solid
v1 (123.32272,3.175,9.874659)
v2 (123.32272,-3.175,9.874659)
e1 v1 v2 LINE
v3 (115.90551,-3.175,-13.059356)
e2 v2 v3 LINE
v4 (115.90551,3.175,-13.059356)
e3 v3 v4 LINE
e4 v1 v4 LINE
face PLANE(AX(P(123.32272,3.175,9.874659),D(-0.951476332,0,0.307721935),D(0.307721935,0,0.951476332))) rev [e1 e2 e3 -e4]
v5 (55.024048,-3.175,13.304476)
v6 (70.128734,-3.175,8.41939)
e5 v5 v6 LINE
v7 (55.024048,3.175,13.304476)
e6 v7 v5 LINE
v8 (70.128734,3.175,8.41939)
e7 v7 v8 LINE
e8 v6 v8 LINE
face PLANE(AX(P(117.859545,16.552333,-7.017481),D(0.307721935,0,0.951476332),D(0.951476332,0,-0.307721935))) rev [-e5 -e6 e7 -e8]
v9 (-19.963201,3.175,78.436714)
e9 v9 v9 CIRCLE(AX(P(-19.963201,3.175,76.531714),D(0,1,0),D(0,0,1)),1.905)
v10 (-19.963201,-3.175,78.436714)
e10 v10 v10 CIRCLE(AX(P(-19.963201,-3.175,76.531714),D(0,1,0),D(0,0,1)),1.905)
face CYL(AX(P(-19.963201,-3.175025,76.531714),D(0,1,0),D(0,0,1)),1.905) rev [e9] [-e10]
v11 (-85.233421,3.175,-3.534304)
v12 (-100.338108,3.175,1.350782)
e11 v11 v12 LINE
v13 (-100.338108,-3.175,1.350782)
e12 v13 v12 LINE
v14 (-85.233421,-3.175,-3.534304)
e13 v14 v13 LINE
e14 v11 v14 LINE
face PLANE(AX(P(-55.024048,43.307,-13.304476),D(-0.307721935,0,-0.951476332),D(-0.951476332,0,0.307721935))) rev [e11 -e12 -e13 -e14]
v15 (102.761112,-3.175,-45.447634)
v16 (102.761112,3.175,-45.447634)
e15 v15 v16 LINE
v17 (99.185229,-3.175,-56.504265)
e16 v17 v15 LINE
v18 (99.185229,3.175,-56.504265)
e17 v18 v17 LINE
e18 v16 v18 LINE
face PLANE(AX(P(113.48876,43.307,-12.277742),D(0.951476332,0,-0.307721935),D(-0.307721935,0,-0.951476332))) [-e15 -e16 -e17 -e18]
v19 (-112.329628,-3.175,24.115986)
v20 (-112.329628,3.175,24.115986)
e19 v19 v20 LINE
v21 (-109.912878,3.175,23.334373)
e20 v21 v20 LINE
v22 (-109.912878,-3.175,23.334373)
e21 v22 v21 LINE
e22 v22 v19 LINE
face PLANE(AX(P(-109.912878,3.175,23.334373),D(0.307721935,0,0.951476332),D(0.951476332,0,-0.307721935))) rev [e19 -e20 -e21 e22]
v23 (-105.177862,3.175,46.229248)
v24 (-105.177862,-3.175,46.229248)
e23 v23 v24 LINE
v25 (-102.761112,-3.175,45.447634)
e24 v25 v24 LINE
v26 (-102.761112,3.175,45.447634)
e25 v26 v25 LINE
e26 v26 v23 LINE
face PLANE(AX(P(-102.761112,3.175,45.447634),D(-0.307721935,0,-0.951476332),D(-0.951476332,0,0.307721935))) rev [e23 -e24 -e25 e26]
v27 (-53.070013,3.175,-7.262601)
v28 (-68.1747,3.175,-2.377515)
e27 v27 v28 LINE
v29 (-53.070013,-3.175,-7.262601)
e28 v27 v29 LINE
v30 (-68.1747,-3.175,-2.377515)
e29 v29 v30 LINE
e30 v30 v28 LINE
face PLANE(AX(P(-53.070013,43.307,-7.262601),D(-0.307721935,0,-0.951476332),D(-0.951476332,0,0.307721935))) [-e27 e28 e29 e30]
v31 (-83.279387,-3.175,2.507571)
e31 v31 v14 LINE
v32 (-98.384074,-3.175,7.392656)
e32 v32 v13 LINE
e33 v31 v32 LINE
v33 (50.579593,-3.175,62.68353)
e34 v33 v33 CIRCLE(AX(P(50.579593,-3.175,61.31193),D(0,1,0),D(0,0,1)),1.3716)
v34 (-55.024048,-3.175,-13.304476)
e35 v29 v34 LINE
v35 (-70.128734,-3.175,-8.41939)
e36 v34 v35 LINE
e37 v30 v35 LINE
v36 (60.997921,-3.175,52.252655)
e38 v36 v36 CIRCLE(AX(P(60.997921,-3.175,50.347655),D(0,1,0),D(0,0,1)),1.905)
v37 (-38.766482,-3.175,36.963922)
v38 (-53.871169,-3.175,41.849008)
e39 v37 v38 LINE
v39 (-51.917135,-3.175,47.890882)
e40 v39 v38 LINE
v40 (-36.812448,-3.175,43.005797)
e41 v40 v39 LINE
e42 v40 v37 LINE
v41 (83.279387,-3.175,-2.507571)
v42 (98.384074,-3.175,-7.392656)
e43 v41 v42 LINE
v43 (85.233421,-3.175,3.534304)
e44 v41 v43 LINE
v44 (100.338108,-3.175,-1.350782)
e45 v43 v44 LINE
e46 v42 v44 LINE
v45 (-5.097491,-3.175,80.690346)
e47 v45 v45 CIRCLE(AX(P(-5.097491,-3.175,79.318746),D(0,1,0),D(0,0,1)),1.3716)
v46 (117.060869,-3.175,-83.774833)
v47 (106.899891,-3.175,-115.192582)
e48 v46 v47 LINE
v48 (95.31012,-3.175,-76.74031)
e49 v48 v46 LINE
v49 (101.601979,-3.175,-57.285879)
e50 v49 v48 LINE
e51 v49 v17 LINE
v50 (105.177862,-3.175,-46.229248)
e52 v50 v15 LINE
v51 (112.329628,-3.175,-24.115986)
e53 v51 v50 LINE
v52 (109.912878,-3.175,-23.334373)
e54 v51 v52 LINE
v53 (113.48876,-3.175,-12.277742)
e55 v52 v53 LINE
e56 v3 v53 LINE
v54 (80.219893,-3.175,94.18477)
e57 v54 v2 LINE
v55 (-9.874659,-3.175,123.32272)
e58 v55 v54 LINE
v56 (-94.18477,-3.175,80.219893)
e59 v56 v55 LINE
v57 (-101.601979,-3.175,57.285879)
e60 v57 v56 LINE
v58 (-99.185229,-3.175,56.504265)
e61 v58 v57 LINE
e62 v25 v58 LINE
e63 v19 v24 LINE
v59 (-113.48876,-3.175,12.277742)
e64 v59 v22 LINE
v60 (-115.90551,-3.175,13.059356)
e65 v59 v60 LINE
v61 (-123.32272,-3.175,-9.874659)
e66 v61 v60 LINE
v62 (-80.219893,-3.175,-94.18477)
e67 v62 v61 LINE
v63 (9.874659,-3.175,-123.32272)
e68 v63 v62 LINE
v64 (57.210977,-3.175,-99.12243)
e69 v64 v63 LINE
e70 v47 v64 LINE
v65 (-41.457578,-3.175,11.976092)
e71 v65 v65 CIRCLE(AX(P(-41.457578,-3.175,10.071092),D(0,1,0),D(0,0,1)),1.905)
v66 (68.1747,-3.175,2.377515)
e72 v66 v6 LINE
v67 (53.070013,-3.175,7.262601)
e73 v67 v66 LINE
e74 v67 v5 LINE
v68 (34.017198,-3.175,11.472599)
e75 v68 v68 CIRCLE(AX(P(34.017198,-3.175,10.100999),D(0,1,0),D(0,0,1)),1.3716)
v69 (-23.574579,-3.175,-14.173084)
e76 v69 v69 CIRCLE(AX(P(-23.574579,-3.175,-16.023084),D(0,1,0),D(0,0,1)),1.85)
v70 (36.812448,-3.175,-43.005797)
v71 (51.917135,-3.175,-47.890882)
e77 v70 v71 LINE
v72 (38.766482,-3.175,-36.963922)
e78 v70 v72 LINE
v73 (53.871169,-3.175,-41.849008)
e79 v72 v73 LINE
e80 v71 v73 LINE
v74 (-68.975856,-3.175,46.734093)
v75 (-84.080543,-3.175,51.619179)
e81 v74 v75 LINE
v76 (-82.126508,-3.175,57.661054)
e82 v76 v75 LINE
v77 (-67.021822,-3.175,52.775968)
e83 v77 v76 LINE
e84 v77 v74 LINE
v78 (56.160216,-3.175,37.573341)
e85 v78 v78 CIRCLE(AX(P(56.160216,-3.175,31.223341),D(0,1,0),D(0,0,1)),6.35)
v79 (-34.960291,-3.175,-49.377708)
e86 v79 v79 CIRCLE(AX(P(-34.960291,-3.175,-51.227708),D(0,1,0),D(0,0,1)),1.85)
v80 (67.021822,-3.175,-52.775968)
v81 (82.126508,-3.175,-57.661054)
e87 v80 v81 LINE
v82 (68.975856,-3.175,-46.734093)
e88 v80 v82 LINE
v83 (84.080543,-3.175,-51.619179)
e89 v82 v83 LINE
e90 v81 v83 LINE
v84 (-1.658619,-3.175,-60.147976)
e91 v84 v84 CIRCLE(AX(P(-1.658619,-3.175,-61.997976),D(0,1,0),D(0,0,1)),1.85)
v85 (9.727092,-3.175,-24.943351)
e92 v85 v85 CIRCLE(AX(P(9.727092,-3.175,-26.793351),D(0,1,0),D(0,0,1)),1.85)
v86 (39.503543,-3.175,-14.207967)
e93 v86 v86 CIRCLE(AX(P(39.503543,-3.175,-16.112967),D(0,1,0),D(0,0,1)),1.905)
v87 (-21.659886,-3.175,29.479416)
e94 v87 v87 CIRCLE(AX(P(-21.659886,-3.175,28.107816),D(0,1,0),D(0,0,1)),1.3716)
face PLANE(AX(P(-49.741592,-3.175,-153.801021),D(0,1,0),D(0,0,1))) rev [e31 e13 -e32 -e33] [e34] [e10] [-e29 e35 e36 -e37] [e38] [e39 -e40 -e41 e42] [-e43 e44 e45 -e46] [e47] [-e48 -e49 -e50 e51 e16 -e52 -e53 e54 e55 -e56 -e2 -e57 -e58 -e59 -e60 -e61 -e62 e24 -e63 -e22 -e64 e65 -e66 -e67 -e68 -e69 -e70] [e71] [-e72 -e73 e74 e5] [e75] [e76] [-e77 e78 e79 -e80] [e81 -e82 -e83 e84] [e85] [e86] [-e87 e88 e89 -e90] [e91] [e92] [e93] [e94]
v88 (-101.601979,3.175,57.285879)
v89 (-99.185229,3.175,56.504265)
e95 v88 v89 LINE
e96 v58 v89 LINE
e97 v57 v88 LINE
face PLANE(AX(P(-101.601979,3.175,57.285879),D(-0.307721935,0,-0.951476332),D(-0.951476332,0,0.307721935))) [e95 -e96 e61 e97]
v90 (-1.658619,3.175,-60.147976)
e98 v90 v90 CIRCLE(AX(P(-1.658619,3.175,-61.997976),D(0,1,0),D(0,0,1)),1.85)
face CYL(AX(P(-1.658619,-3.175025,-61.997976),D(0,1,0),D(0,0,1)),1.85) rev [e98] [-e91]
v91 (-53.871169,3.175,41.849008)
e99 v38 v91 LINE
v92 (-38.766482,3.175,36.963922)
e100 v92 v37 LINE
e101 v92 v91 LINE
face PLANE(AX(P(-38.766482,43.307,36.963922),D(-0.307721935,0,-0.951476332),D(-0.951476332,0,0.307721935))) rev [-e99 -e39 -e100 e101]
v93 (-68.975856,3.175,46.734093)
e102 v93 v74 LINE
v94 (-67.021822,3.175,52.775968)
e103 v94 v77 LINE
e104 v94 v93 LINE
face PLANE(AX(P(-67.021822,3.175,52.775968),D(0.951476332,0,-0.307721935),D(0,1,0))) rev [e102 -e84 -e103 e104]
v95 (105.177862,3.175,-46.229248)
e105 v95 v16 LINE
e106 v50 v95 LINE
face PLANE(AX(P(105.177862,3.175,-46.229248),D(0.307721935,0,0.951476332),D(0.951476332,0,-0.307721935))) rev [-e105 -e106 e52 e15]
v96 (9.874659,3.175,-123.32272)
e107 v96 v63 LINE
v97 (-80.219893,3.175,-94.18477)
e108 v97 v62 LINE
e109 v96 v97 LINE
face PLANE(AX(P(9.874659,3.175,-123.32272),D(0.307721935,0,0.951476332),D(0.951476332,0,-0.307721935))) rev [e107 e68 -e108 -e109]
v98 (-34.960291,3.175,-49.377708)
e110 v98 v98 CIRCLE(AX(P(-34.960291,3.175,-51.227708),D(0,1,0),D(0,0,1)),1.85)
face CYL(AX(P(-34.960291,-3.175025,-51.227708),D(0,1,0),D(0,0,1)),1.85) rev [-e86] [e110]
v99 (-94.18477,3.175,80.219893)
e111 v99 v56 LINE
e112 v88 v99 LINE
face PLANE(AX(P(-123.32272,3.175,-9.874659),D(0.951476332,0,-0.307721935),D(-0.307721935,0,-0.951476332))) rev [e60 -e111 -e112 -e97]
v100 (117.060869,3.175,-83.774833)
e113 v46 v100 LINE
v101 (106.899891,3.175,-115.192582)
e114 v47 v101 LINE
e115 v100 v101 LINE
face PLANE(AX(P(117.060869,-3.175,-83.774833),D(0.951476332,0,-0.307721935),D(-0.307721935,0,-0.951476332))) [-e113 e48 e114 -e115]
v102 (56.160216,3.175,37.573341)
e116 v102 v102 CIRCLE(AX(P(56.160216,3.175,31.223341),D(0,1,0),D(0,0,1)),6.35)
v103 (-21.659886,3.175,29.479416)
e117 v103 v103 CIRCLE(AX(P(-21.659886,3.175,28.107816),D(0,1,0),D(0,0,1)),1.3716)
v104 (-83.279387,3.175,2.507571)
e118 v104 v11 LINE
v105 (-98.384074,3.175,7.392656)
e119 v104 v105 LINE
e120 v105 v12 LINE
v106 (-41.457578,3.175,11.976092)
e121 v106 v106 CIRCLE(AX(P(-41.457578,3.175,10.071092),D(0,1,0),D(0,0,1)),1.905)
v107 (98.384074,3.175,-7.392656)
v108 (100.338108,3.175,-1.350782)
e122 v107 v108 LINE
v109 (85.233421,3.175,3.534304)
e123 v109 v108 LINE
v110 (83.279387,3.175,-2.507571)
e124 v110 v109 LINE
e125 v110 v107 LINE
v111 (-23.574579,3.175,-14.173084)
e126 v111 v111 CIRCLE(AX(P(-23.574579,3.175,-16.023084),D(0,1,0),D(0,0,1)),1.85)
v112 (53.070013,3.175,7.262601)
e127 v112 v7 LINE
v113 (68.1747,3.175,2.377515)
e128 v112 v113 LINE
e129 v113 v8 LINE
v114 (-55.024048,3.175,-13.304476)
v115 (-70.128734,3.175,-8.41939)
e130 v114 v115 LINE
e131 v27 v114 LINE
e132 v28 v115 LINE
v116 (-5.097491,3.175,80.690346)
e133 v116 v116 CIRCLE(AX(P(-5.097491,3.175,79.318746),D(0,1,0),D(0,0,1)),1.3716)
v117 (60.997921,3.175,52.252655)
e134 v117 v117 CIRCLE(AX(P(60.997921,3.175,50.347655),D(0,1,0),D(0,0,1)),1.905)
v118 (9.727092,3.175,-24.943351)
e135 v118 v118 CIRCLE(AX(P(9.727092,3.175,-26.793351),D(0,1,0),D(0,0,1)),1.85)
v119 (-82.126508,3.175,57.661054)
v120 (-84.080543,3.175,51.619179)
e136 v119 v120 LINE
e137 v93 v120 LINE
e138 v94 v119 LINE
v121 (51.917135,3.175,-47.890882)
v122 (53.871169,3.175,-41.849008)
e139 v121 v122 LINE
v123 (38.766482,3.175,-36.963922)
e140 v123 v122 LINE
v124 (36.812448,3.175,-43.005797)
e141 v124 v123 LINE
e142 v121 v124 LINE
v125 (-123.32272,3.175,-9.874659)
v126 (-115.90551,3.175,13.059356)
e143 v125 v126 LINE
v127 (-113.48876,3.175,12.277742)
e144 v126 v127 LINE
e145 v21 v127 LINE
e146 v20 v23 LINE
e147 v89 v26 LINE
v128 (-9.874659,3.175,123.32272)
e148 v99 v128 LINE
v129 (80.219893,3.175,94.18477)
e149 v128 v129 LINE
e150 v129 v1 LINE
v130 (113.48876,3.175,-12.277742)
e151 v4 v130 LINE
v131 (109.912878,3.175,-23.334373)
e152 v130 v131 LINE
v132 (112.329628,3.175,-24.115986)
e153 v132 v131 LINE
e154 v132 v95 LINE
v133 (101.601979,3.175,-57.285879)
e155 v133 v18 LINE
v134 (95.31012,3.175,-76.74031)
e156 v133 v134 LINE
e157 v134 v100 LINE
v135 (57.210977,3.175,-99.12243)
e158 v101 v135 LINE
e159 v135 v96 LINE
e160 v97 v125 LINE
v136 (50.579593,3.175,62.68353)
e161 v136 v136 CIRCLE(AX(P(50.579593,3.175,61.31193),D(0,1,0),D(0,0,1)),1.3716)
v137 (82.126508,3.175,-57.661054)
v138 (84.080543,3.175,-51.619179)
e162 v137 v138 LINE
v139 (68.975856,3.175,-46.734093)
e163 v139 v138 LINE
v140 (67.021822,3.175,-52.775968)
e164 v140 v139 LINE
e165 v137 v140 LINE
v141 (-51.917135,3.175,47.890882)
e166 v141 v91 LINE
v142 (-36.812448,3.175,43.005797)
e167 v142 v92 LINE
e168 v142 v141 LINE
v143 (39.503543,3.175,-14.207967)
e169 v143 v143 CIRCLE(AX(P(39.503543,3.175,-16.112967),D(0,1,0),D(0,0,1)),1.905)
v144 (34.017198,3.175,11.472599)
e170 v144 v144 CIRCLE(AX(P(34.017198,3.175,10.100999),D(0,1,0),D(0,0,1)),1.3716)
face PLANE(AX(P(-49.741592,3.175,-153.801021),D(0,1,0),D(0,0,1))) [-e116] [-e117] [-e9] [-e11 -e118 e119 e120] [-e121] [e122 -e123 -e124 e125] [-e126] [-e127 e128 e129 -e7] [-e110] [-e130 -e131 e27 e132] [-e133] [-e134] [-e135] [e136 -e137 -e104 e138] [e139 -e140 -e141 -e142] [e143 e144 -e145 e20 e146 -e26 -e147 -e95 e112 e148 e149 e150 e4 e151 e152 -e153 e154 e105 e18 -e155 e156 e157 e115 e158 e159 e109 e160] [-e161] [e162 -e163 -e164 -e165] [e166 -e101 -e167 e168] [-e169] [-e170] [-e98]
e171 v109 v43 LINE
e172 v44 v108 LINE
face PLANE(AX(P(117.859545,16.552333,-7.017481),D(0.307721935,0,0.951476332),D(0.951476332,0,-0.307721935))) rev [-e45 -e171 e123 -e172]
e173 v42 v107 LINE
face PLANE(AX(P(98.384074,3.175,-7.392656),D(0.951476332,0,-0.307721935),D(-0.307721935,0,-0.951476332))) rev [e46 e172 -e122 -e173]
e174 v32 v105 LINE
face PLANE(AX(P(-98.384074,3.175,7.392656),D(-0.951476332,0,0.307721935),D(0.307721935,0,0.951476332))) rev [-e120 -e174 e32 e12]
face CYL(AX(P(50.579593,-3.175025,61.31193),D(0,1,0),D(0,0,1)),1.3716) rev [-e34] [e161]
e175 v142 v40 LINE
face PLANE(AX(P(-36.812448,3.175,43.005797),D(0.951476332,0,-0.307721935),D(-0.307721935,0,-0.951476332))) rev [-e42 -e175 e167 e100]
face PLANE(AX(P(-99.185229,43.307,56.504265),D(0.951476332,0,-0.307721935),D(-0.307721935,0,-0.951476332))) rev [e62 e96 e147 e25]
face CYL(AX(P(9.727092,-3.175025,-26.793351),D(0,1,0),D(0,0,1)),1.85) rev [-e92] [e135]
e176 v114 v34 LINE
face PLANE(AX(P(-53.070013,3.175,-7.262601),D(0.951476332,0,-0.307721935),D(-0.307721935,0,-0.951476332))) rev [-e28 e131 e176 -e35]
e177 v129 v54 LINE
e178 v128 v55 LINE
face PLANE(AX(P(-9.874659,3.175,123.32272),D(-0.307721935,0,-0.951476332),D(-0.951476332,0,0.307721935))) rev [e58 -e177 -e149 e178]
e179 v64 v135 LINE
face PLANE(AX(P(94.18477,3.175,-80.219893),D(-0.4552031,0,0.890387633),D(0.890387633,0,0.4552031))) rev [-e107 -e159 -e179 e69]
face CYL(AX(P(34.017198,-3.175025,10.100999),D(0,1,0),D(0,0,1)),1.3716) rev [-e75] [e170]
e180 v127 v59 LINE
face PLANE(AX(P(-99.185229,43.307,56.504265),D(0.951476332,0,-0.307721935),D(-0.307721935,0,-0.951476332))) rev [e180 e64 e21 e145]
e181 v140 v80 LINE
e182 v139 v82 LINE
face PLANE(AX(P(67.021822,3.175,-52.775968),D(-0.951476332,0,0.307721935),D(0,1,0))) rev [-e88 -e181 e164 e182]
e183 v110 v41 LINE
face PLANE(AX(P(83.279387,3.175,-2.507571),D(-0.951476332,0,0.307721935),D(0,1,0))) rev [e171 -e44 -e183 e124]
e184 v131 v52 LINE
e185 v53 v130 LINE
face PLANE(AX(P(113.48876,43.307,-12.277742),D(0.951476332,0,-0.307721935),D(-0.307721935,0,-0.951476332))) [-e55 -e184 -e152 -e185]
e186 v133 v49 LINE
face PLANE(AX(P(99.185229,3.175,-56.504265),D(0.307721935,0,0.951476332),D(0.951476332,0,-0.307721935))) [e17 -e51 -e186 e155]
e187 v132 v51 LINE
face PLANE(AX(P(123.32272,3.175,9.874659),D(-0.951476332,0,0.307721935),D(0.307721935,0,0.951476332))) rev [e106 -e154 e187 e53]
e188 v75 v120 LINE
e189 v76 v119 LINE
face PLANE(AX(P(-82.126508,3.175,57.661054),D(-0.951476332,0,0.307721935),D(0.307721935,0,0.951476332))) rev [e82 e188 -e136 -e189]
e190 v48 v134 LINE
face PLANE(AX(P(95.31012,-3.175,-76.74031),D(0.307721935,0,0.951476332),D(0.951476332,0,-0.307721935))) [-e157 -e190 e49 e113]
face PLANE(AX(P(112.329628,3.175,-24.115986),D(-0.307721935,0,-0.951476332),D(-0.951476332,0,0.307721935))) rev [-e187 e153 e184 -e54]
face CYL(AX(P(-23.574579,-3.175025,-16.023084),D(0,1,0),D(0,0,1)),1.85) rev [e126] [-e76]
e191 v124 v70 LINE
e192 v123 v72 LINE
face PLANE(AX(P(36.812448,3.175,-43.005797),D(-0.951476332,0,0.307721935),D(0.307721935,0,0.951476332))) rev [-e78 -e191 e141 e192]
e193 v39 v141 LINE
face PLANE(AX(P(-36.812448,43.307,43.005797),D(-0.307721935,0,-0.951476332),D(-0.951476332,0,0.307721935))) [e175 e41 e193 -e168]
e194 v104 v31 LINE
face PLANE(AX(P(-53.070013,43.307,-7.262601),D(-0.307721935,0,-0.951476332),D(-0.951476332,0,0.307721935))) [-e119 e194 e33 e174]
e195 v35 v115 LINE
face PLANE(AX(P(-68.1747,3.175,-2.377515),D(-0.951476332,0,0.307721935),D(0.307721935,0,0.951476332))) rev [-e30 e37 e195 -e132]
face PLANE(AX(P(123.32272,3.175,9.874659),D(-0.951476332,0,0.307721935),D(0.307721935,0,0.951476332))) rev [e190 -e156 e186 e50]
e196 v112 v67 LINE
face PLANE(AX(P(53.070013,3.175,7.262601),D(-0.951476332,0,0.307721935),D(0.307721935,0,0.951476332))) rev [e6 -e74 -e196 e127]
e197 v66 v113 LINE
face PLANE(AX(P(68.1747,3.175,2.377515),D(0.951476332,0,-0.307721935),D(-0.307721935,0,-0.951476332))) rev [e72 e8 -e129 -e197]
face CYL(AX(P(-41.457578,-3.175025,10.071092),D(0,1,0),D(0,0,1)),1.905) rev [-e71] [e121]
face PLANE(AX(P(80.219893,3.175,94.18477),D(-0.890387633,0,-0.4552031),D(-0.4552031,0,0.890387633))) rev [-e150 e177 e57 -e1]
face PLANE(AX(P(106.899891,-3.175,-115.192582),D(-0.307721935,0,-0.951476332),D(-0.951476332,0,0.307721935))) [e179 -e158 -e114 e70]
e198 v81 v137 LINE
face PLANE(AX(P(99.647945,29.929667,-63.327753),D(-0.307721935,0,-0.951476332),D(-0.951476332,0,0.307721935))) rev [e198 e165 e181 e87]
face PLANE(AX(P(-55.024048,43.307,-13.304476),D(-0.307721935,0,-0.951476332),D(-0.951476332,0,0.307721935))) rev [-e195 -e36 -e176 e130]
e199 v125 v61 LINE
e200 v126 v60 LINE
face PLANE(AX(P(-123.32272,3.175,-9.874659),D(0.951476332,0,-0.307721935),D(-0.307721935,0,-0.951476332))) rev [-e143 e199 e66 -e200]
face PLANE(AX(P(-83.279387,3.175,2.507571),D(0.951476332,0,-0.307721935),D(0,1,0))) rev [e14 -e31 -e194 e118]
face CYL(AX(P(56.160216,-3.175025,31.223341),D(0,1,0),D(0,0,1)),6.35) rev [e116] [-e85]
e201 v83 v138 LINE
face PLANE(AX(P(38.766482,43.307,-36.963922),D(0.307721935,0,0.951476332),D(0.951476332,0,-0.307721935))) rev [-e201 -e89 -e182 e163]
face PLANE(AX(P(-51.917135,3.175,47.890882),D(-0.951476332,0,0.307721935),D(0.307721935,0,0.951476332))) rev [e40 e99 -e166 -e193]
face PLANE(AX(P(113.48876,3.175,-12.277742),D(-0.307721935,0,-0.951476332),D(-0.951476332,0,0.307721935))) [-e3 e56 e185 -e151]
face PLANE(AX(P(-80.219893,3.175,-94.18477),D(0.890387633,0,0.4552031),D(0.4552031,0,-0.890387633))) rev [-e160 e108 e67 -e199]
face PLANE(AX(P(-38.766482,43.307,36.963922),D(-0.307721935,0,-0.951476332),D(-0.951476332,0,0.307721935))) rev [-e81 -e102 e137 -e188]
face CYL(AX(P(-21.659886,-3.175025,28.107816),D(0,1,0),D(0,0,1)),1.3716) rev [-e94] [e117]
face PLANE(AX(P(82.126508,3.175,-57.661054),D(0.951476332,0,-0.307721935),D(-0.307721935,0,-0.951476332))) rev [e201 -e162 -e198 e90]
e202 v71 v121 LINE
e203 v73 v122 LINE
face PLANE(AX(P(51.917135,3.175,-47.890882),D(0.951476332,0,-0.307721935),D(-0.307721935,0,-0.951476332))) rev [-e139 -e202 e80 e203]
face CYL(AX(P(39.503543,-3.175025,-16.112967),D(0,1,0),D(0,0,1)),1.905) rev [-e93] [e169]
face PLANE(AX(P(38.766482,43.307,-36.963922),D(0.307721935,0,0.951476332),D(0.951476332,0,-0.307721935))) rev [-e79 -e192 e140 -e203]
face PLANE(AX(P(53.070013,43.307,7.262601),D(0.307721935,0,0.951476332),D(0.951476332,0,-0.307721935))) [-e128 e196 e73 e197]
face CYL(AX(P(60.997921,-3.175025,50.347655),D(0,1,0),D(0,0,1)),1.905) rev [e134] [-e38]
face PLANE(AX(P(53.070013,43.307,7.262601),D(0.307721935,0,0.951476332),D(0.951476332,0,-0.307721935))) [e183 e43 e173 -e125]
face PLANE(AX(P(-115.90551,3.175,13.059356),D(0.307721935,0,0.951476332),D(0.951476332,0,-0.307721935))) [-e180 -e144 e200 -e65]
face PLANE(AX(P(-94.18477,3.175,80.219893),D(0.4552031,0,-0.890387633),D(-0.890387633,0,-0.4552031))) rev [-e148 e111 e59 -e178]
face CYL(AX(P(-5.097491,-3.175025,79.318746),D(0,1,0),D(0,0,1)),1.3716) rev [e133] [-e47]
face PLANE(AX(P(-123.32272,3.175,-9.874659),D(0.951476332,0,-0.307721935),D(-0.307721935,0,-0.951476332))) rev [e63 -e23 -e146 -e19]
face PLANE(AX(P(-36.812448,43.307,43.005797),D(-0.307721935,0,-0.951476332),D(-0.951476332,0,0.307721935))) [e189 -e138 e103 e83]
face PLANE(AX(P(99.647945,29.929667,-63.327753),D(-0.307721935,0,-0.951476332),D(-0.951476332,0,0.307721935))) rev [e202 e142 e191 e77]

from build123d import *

# Parameters (mm, degrees)
BOSS_EXTRUDE1_DEPTH = 3.175
BOSS_EXTRUDE2_DEPTH = 6.35
CAVITY2_START       = -95.885
CAVITY2_OUTLINE_W   = 6.35
CAVITY2_OUTLINE_H   = 6.35
CAVITY2_DEPTH       = 15.875
CAVITY2_START_2     = -64.135
CAVITY2_2_OUTLINE_W = 6.35
CAVITY2_2_OUTLINE_H = 6.35
CAVITY2_2_DEPTH     = 15.875
SKETCH6_R           = 1.3716
CUT_EXTRUDE1_DEPTH  = 175.52022504
SKETCH7_R           = 6.35
CUT_EXTRUDE2_DEPTH  = 175.52022504
SKETCH9_R           = 1.905
CUT_EXTRUDE3_DEPTH  = 175.52022504
SKETCH10_R          = 1.85
CUT_EXTRUDE4_DEPTH  = 175.52022504
CAVITY3_START       = 48.26
CAVITY3_OUTLINE_W   = 6.35
CAVITY3_OUTLINE_H   = 6.35
CAVITY3_DEPTH       = 15.875
CAVITY3_START_2     = 80.01
CAVITY3_2_OUTLINE_W = 6.35
CAVITY3_2_OUTLINE_H = 6.35
CAVITY3_2_DEPTH     = 15.875
CAVITY3_START_3     = -95.885
CAVITY3_3_OUTLINE_W = 6.35
CAVITY3_3_OUTLINE_H = 6.35
CAVITY3_3_DEPTH     = 15.875
CAVITY3_START_4     = -64.135
CAVITY3_4_OUTLINE_W = 6.35
CAVITY3_4_OUTLINE_H = 6.35
CAVITY3_4_DEPTH     = 15.875
CAVITY3_START_5     = -114.3
CAVITY3_5_OUTLINE_W = 6.35
CAVITY3_5_OUTLINE_H = 11.6205
CAVITY3_5_DEPTH     = 2.54
CAVITY3_START_6     = 111.76
CAVITY3_6_OUTLINE_W = 6.35
CAVITY3_6_OUTLINE_H = 11.6205
CAVITY3_6_DEPTH     = 2.54


# Read off the part's stored shape, not the designer's step: Cavity2, Cavity3
with BuildPart() as part:
    # Sketch1 → Boss-Extrude1 (new, symmetric)
    with BuildSketch(Plane(origin=(0, 0, 0), x_dir=(1, 0, 0), z_dir=(0, 1, 0))):
        Polygon((9.874658932, 123.322719821), (-80.219893167, 94.184769753), (-123.322719821, 9.874658932), (-94.184769753, -80.219893167), (-9.874658932, -123.322719821), (80.219893167, -94.184769753), (123.322719821, -9.874658932), (94.184769753, 80.219893167), align=None)
    extrude(amount=BOSS_EXTRUDE1_DEPTH, both=True)

    # Sketch3 → Boss-Extrude2 (add)
    with BuildSketch(Plane(origin=(0, 3.175, 0), x_dir=(1, 0, 0), z_dir=(0, 1, 0))):
        Polygon((95.310120051, 76.74030964), (117.060869008, 83.774833064), (106.89989073, 115.192581558), (57.210976805, 99.122430154), (94.184769753, 80.219893167), align=None)
    extrude(amount=-BOSS_EXTRUDE2_DEPTH)

    # Cavity2 outline → Cavity2 (cut)
    with BuildSketch(Plane(origin=(0, 0, 0), x_dir=(0, 1, 0), z_dir=(0.9514763323416664, 0, -0.3077219345344931)).offset(CAVITY2_START)):
        with Locations((0, 26.416)):
            Rectangle(CAVITY2_OUTLINE_W, CAVITY2_OUTLINE_H)
    extrude(amount=CAVITY2_DEPTH, mode=Mode.SUBTRACT)

    # Cavity2 2 outline → Cavity2 2 (cut)
    with BuildSketch(Plane(origin=(0, 0, 0), x_dir=(0, 1, 0), z_dir=(0.9514763323416664, 0, -0.3077219345344931)).offset(CAVITY2_START_2)):
        with Locations((0, 26.416)):
            Rectangle(CAVITY2_2_OUTLINE_W, CAVITY2_2_OUTLINE_H)
    extrude(amount=CAVITY2_2_DEPTH, mode=Mode.SUBTRACT)

    # Sketch6 → Cut-Extrude1 (cut, through all)
    with BuildSketch(Plane(origin=(0, 3.175, 0), x_dir=(1, 0, 0), z_dir=(0, 1, 0))):
        with Locations(Location((-5.097490915, -79.318746248, 0), (0, 0, 270))):
            Circle(SKETCH6_R)
        with Locations(Location((50.579592916, -61.311929511, 0), (0, 0, 270))):
            Circle(SKETCH6_R)
        with Locations(Location((34.017198322, -10.100999466, 0), (0, 0, 270))):
            Circle(SKETCH6_R)
        with Locations(Location((-21.659885509, -28.107816203, 0), (0, 0, 270))):
            Circle(SKETCH6_R)
    extrude(amount=-CUT_EXTRUDE1_DEPTH, mode=Mode.SUBTRACT)

    # Sketch7 → Cut-Extrude2 (cut, through all)
    with BuildSketch(Plane(origin=(0, 3.175, 0), x_dir=(1, 0, 0), z_dir=(0, 1, 0))):
        with Locations(Location((56.160215938, -31.223340716, 0), (0, 0, 270))):
            Circle(SKETCH7_R)
    extrude(amount=-CUT_EXTRUDE2_DEPTH, mode=Mode.SUBTRACT)

    # Sketch9 → Cut-Extrude3 (cut, through all)
    with BuildSketch(Plane(origin=(0, 3.175, 0), x_dir=(1, 0, 0), z_dir=(0, 1, 0))):
        with Locations(Location((-19.963200574, -76.531714164, 0), (0, 0, 270))):
            Circle(SKETCH9_R)
        with Locations(Location((-41.457577702, -10.07109235, 0), (0, 0, 270))):
            Circle(SKETCH9_R)
        with Locations(Location((60.997920545, -50.347654754, 0), (0, 0, 270))):
            Circle(SKETCH9_R)
        with Locations(Location((39.503543417, 16.11296706, 0), (0, 0, 270))):
            Circle(SKETCH9_R)
    extrude(amount=-CUT_EXTRUDE3_DEPTH, mode=Mode.SUBTRACT)

    # Sketch10 → Cut-Extrude4 (cut, through all)
    with BuildSketch(Plane(origin=(0, 3.175, 0), x_dir=(1, 0, 0), z_dir=(0, 1, 0))):
        with Locations(Location((-1.658619289, 61.997975629, 0), (0, 0, 270))):
            Circle(SKETCH10_R)
        with Locations(Location((-34.960290921, 51.22770792, 0), (0, 0, 270))):
            Circle(SKETCH10_R)
        with Locations(Location((-23.574579343, 16.023083623, 0), (0, 0, 270))):
            Circle(SKETCH10_R)
        with Locations(Location((9.727092289, 26.793351332, 0), (0, 0, 270))):
            Circle(SKETCH10_R)
    extrude(amount=-CUT_EXTRUDE4_DEPTH, mode=Mode.SUBTRACT)

    # Cavity3 outline → Cavity3 (cut)
    with BuildSketch(Plane(origin=(0, 0, 0), x_dir=(0, 1, 0), z_dir=(0.9514763323416664, 0, -0.3077219345344931)).offset(CAVITY3_START)):
        with Locations((0, 26.416)):
            Rectangle(CAVITY3_OUTLINE_W, CAVITY3_OUTLINE_H)
        with Locations((0, -26.416)):
            Rectangle(CAVITY3_OUTLINE_W, CAVITY3_OUTLINE_H)
    extrude(amount=CAVITY3_DEPTH, mode=Mode.SUBTRACT)

    # Cavity3 2 outline → Cavity3 2 (cut)
    with BuildSketch(Plane(origin=(0, 0, 0), x_dir=(0, 1, 0), z_dir=(0.9514763323416664, 0, -0.3077219345344931)).offset(CAVITY3_START_2)):
        with Locations((0, 26.416)):
            Rectangle(CAVITY3_2_OUTLINE_W, CAVITY3_2_OUTLINE_H)
        with Locations((0, -26.416)):
            Rectangle(CAVITY3_2_OUTLINE_W, CAVITY3_2_OUTLINE_H)
    extrude(amount=CAVITY3_2_DEPTH, mode=Mode.SUBTRACT)

    # Cavity3 3 outline → Cavity3 3 (cut)
    with BuildSketch(Plane(origin=(0, 0, 0), x_dir=(0, 1, 0), z_dir=(0.9514763323416664, 0, -0.3077219345344931)).offset(CAVITY3_START_3)):
        with Locations((0, -26.416)):
            Rectangle(CAVITY3_3_OUTLINE_W, CAVITY3_3_OUTLINE_H)
    extrude(amount=CAVITY3_3_DEPTH, mode=Mode.SUBTRACT)

    # Cavity3 4 outline → Cavity3 4 (cut)
    with BuildSketch(Plane(origin=(0, 0, 0), x_dir=(0, 1, 0), z_dir=(0.9514763323416664, 0, -0.3077219345344931)).offset(CAVITY3_START_4)):
        with Locations((0, -26.416)):
            Rectangle(CAVITY3_4_OUTLINE_W, CAVITY3_4_OUTLINE_H)
    extrude(amount=CAVITY3_4_DEPTH, mode=Mode.SUBTRACT)

    # Cavity3 5 outline → Cavity3 5 (cut)
    with BuildSketch(Plane(origin=(0, 0, 0), x_dir=(0, 1, 0), z_dir=(0.9514763323416664, 0, -0.3077219345344931)).offset(CAVITY3_START_5)):
        with Locations((0, 17.43075)):
            Rectangle(CAVITY3_5_OUTLINE_W, CAVITY3_5_OUTLINE_H)
        with Locations((0, -17.43075)):
            Rectangle(CAVITY3_5_OUTLINE_W, CAVITY3_5_OUTLINE_H)
    extrude(amount=CAVITY3_5_DEPTH, mode=Mode.SUBTRACT)

    # Cavity3 6 outline → Cavity3 6 (cut)
    with BuildSketch(Plane(origin=(0, 0, 0), x_dir=(0, 1, 0), z_dir=(0.9514763323416664, 0, -0.3077219345344931)).offset(CAVITY3_START_6)):
        with Locations((0, 17.43075)):
            Rectangle(CAVITY3_6_OUTLINE_W, CAVITY3_6_OUTLINE_H)
        with Locations((0, -17.43075)):
            Rectangle(CAVITY3_6_OUTLINE_W, CAVITY3_6_OUTLINE_H)
    extrude(amount=CAVITY3_6_DEPTH, mode=Mode.SUBTRACT)


solid = part.part
